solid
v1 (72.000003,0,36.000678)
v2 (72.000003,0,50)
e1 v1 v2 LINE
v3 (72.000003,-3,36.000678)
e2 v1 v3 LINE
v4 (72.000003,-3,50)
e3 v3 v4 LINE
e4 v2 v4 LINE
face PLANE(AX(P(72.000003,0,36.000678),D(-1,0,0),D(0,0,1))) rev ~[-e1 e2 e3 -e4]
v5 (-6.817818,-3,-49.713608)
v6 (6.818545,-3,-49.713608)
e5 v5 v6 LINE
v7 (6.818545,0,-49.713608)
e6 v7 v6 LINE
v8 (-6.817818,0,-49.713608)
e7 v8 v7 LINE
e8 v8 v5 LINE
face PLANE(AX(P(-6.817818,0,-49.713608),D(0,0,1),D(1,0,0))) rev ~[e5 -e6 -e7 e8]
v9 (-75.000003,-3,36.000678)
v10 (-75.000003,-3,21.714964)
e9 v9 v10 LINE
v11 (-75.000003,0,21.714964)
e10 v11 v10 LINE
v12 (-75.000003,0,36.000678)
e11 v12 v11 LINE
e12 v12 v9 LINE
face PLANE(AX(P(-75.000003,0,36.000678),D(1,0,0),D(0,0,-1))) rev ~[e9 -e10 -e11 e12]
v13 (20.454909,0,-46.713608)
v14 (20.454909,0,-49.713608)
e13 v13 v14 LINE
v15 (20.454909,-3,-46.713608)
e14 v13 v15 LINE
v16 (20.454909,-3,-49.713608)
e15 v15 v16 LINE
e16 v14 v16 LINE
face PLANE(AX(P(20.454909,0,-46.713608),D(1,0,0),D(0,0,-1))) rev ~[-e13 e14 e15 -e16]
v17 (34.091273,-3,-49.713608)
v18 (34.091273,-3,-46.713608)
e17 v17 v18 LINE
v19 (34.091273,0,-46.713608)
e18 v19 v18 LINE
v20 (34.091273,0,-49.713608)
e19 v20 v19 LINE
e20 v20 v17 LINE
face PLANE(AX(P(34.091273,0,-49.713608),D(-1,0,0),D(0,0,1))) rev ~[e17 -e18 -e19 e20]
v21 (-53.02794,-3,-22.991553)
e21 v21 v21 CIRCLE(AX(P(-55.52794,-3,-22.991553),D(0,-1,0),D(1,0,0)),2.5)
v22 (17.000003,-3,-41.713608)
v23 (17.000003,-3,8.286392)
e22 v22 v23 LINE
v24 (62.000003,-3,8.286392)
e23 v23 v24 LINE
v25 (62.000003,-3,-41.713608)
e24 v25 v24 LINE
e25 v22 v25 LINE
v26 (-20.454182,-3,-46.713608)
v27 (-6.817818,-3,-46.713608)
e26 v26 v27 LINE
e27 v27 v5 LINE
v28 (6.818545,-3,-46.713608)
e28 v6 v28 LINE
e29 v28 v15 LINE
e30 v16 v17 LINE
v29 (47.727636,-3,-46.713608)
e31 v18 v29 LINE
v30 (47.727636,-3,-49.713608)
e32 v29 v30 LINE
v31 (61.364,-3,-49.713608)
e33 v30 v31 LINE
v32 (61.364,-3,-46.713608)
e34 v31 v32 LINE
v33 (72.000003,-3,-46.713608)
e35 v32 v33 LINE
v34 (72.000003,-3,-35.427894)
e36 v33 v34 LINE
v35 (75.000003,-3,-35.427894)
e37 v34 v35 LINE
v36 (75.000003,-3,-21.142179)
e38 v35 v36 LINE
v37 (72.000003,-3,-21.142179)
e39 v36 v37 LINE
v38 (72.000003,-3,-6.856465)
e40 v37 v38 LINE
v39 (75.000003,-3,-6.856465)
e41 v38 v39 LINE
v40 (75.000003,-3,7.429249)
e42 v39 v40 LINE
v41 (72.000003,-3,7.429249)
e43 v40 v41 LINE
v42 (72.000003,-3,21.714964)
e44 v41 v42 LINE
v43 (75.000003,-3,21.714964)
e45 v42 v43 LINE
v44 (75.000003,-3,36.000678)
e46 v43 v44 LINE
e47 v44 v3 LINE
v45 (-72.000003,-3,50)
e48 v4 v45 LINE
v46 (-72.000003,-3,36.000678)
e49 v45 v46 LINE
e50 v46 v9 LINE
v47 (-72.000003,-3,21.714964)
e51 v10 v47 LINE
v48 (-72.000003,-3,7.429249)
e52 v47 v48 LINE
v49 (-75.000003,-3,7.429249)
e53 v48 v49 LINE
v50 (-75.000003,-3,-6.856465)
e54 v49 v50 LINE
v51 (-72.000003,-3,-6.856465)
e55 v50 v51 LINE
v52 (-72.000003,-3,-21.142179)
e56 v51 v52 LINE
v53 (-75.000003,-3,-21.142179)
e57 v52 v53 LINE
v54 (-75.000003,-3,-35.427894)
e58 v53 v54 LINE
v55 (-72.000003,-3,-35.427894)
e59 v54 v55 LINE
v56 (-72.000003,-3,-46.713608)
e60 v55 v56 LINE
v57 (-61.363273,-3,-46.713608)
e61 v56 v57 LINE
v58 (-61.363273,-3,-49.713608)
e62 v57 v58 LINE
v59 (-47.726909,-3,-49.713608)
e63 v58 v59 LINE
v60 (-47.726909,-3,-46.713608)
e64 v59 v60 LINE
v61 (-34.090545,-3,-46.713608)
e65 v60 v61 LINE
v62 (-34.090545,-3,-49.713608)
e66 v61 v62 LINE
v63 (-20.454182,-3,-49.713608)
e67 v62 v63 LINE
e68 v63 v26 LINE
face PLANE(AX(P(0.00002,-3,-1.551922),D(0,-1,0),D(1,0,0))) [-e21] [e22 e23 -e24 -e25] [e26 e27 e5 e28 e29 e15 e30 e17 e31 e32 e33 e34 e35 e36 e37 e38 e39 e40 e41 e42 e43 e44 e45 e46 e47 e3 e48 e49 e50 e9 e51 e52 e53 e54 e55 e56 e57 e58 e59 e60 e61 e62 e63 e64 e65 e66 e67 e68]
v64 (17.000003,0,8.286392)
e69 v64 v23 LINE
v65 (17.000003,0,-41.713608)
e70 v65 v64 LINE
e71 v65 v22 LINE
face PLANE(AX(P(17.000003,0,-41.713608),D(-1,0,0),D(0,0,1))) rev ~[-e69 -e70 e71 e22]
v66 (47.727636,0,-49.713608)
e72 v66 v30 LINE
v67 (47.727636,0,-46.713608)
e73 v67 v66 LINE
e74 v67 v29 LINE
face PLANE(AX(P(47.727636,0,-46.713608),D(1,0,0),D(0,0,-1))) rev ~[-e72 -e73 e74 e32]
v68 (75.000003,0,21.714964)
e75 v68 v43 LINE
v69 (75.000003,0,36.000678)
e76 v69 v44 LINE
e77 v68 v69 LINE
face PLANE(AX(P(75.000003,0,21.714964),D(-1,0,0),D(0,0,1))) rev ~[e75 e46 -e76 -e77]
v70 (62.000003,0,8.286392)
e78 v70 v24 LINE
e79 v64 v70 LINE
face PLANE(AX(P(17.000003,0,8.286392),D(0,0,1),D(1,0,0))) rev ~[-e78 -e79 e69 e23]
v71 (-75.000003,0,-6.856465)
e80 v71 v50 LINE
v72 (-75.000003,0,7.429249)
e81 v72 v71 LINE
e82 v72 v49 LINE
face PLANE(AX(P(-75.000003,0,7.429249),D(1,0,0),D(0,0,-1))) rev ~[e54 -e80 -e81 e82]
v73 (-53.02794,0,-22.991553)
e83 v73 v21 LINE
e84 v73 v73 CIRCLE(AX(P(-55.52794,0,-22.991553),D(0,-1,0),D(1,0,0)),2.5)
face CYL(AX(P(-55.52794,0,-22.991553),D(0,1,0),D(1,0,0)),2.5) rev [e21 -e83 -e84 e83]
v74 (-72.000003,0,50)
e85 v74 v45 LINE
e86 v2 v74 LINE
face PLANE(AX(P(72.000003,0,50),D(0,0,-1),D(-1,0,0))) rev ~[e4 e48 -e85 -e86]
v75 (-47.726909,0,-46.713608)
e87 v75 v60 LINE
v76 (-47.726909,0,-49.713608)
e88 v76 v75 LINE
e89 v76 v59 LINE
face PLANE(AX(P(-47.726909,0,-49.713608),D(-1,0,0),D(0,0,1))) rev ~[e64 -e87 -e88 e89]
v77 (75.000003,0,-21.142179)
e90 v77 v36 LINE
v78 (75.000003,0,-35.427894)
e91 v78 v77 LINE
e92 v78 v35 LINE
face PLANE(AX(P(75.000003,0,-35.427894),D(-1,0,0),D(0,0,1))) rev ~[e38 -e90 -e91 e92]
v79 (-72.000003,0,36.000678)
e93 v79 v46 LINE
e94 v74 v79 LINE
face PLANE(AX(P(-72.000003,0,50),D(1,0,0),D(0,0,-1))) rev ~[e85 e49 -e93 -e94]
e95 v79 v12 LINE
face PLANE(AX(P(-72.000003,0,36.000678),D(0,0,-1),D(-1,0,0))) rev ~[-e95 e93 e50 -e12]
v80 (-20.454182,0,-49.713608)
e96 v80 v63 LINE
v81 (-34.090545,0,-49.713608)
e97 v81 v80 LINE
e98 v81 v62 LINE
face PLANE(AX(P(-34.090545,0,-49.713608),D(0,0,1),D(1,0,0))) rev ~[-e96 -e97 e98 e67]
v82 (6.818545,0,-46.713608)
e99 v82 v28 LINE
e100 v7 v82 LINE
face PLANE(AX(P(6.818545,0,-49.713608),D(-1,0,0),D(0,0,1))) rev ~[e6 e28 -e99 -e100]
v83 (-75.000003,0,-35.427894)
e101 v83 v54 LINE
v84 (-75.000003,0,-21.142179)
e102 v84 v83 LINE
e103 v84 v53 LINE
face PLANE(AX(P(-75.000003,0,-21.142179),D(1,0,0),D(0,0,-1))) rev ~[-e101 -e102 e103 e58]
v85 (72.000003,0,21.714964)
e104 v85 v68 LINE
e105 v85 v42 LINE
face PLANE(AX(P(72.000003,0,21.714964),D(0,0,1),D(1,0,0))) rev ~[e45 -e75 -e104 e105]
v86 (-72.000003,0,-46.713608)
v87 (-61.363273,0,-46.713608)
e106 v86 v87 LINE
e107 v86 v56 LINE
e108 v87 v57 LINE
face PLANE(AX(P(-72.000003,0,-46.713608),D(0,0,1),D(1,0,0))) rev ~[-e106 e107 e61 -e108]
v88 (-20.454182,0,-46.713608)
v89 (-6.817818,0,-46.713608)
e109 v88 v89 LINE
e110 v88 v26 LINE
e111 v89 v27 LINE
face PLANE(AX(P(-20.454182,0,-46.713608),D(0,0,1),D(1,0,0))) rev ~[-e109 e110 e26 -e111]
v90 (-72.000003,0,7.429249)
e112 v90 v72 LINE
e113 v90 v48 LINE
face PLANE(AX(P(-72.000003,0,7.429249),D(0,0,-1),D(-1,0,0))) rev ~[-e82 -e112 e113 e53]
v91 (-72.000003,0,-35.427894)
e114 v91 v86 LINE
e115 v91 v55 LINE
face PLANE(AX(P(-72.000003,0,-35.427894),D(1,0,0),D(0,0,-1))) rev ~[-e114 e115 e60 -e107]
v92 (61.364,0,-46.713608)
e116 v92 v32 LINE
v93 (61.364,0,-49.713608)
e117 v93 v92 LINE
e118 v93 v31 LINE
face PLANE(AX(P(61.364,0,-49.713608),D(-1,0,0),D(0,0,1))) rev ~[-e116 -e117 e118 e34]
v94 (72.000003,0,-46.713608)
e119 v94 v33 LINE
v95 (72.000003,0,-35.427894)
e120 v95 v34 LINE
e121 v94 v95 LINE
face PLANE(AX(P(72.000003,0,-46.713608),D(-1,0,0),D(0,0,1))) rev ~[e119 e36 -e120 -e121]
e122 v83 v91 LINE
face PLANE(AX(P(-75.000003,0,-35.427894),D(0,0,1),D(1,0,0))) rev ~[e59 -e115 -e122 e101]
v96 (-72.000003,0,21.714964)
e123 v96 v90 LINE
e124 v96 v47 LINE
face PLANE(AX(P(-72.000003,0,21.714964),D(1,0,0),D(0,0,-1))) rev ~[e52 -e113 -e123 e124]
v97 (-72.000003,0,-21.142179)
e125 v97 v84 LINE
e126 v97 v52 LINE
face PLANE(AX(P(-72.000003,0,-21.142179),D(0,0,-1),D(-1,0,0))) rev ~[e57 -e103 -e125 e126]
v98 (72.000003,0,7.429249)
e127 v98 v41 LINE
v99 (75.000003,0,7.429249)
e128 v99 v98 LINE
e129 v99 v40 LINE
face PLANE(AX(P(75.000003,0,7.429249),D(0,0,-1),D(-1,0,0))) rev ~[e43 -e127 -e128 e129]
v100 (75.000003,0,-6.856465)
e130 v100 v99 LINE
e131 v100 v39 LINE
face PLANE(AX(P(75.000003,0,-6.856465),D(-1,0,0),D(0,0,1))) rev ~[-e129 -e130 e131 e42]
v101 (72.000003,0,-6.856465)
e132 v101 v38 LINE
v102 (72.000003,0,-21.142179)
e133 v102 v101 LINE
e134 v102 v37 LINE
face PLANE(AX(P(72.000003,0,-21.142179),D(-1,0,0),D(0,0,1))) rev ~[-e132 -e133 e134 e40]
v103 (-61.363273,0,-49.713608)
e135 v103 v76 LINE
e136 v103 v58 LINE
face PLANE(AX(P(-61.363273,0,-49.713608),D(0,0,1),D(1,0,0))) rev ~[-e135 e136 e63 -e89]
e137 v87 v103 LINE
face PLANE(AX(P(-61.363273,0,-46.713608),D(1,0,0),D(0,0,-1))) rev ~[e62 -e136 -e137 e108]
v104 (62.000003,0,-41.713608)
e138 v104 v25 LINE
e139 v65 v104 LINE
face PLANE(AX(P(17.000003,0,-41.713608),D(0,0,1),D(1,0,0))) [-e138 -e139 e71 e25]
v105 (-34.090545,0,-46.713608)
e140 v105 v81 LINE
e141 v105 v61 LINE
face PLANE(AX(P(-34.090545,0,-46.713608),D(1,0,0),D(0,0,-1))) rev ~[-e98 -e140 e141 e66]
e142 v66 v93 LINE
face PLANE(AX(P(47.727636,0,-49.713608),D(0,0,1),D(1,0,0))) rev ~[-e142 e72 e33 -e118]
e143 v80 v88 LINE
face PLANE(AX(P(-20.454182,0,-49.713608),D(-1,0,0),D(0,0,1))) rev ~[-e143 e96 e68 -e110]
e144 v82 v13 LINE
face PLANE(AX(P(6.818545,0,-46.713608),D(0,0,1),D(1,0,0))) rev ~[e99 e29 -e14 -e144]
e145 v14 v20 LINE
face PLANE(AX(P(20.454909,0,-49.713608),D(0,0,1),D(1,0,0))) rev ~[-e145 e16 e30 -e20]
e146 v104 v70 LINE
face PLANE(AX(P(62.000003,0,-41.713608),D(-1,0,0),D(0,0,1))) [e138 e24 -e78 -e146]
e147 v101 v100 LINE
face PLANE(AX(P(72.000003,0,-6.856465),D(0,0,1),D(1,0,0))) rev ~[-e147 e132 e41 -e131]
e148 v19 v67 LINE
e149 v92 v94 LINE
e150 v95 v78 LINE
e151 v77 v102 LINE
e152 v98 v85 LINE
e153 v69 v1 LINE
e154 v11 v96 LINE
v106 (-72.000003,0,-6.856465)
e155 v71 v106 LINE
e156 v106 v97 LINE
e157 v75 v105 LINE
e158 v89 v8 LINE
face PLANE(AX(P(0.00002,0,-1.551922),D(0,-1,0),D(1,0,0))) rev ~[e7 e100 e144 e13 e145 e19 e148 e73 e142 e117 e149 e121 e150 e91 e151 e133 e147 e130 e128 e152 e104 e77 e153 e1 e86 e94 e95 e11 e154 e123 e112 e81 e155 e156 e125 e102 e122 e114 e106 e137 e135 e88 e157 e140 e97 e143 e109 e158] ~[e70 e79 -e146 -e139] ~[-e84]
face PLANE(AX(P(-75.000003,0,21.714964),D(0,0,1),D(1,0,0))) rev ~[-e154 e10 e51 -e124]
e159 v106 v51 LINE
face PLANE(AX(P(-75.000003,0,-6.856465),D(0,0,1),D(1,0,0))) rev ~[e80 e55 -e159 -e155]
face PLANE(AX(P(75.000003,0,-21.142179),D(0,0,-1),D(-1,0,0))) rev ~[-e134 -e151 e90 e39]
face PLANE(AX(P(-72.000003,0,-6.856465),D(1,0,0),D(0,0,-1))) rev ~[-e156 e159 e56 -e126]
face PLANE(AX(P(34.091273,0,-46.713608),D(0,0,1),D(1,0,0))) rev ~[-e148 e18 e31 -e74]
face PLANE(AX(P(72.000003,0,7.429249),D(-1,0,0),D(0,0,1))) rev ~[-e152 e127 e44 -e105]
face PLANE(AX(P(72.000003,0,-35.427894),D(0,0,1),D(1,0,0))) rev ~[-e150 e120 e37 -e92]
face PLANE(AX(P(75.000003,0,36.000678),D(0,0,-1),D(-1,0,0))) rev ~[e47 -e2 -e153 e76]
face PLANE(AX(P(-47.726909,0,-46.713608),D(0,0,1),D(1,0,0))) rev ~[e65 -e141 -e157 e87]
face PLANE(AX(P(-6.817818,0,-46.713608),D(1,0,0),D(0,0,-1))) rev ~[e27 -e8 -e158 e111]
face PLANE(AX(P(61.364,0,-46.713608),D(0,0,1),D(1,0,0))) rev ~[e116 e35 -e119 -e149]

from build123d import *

# Parameters (mm, degrees)
F0_R     = 2.5
F0_W     = 45
F0_H     = 50
F1_DEPTH = 3


# Not quite as in the source:
# - ends of sketch curves that miss each other by under 0.0002 mm in the source are joined


with BuildPart() as f1:
    # F0 (on Front) → F1 (new body)
    with BuildSketch(Plane.XZ):
        Polygon((72.0000029802, 36.0006778365), (72.0000029802, 50), (-72.0000029802, 50), (-72.0000029802, 36.0006778365), (-75.0000029802, 36.0006778365), (-75.0000029802, 21.7149635505), (-72.0000029802, 21.7149635505), (-72.0000029802, 7.4292492645), (-75.0000029802, 7.4292492645), (-75.0000029802, -6.8564650215), (-72.0000029802, -6.8564650215), (-72.0000029802, -21.1421793075), (-75.0000029802, -21.1421793075), (-75.0000029802, -35.4278935935), (-72.0000029802, -35.4278935935), (-72.0000029802, -46.7136078775), (-61.363272724, -46.7136078775), (-61.363272724, -49.7136078775), (-47.726909088, -49.7136078775), (-47.726909088, -46.7136078775), (-34.090545452, -46.7136078775), (-34.090545452, -49.7136078775), (-20.454181816, -49.7136078775), (-20.454181816, -46.7136078775), (-6.81781818, -46.7136078775), (-6.81781818, -49.7136078775), (6.818545456, -49.7136078775), (6.818545456, -46.7136078775), (20.454909092, -46.7136078775), (20.454909092, -49.7136078775), (34.091272728, -49.7136078775), (34.091272728, -46.7136078775), (47.727636364, -46.7136078775), (47.727636364, -49.7136078775), (61.364, -49.7136078775), (61.364, -46.7136078775), (72.0000029802, -46.7136078775), (72.0000029802, -35.4278935935), (75.0000029802, -35.4278935935), (75.0000029802, -21.1421793075), (72.0000029802, -21.1421793075), (72.0000029802, -6.8564650215), (75.0000029802, -6.8564650215), (75.0000029802, 7.4292492645), (72.0000029802, 7.4292492645), (72.0000029802, 21.7149635505), (75.0000029802, 21.7149635505), (75.0000029802, 36.0006778365), align=None)
        with Locations((-55.5279403925, -22.991552949)):
            Circle(F0_R, mode=Mode.SUBTRACT)
        with Locations((39.5000029802, -16.7136078775)):
            Rectangle(F0_W, F0_H, mode=Mode.SUBTRACT)
    extrude(amount=F1_DEPTH)


solid = f1.part
